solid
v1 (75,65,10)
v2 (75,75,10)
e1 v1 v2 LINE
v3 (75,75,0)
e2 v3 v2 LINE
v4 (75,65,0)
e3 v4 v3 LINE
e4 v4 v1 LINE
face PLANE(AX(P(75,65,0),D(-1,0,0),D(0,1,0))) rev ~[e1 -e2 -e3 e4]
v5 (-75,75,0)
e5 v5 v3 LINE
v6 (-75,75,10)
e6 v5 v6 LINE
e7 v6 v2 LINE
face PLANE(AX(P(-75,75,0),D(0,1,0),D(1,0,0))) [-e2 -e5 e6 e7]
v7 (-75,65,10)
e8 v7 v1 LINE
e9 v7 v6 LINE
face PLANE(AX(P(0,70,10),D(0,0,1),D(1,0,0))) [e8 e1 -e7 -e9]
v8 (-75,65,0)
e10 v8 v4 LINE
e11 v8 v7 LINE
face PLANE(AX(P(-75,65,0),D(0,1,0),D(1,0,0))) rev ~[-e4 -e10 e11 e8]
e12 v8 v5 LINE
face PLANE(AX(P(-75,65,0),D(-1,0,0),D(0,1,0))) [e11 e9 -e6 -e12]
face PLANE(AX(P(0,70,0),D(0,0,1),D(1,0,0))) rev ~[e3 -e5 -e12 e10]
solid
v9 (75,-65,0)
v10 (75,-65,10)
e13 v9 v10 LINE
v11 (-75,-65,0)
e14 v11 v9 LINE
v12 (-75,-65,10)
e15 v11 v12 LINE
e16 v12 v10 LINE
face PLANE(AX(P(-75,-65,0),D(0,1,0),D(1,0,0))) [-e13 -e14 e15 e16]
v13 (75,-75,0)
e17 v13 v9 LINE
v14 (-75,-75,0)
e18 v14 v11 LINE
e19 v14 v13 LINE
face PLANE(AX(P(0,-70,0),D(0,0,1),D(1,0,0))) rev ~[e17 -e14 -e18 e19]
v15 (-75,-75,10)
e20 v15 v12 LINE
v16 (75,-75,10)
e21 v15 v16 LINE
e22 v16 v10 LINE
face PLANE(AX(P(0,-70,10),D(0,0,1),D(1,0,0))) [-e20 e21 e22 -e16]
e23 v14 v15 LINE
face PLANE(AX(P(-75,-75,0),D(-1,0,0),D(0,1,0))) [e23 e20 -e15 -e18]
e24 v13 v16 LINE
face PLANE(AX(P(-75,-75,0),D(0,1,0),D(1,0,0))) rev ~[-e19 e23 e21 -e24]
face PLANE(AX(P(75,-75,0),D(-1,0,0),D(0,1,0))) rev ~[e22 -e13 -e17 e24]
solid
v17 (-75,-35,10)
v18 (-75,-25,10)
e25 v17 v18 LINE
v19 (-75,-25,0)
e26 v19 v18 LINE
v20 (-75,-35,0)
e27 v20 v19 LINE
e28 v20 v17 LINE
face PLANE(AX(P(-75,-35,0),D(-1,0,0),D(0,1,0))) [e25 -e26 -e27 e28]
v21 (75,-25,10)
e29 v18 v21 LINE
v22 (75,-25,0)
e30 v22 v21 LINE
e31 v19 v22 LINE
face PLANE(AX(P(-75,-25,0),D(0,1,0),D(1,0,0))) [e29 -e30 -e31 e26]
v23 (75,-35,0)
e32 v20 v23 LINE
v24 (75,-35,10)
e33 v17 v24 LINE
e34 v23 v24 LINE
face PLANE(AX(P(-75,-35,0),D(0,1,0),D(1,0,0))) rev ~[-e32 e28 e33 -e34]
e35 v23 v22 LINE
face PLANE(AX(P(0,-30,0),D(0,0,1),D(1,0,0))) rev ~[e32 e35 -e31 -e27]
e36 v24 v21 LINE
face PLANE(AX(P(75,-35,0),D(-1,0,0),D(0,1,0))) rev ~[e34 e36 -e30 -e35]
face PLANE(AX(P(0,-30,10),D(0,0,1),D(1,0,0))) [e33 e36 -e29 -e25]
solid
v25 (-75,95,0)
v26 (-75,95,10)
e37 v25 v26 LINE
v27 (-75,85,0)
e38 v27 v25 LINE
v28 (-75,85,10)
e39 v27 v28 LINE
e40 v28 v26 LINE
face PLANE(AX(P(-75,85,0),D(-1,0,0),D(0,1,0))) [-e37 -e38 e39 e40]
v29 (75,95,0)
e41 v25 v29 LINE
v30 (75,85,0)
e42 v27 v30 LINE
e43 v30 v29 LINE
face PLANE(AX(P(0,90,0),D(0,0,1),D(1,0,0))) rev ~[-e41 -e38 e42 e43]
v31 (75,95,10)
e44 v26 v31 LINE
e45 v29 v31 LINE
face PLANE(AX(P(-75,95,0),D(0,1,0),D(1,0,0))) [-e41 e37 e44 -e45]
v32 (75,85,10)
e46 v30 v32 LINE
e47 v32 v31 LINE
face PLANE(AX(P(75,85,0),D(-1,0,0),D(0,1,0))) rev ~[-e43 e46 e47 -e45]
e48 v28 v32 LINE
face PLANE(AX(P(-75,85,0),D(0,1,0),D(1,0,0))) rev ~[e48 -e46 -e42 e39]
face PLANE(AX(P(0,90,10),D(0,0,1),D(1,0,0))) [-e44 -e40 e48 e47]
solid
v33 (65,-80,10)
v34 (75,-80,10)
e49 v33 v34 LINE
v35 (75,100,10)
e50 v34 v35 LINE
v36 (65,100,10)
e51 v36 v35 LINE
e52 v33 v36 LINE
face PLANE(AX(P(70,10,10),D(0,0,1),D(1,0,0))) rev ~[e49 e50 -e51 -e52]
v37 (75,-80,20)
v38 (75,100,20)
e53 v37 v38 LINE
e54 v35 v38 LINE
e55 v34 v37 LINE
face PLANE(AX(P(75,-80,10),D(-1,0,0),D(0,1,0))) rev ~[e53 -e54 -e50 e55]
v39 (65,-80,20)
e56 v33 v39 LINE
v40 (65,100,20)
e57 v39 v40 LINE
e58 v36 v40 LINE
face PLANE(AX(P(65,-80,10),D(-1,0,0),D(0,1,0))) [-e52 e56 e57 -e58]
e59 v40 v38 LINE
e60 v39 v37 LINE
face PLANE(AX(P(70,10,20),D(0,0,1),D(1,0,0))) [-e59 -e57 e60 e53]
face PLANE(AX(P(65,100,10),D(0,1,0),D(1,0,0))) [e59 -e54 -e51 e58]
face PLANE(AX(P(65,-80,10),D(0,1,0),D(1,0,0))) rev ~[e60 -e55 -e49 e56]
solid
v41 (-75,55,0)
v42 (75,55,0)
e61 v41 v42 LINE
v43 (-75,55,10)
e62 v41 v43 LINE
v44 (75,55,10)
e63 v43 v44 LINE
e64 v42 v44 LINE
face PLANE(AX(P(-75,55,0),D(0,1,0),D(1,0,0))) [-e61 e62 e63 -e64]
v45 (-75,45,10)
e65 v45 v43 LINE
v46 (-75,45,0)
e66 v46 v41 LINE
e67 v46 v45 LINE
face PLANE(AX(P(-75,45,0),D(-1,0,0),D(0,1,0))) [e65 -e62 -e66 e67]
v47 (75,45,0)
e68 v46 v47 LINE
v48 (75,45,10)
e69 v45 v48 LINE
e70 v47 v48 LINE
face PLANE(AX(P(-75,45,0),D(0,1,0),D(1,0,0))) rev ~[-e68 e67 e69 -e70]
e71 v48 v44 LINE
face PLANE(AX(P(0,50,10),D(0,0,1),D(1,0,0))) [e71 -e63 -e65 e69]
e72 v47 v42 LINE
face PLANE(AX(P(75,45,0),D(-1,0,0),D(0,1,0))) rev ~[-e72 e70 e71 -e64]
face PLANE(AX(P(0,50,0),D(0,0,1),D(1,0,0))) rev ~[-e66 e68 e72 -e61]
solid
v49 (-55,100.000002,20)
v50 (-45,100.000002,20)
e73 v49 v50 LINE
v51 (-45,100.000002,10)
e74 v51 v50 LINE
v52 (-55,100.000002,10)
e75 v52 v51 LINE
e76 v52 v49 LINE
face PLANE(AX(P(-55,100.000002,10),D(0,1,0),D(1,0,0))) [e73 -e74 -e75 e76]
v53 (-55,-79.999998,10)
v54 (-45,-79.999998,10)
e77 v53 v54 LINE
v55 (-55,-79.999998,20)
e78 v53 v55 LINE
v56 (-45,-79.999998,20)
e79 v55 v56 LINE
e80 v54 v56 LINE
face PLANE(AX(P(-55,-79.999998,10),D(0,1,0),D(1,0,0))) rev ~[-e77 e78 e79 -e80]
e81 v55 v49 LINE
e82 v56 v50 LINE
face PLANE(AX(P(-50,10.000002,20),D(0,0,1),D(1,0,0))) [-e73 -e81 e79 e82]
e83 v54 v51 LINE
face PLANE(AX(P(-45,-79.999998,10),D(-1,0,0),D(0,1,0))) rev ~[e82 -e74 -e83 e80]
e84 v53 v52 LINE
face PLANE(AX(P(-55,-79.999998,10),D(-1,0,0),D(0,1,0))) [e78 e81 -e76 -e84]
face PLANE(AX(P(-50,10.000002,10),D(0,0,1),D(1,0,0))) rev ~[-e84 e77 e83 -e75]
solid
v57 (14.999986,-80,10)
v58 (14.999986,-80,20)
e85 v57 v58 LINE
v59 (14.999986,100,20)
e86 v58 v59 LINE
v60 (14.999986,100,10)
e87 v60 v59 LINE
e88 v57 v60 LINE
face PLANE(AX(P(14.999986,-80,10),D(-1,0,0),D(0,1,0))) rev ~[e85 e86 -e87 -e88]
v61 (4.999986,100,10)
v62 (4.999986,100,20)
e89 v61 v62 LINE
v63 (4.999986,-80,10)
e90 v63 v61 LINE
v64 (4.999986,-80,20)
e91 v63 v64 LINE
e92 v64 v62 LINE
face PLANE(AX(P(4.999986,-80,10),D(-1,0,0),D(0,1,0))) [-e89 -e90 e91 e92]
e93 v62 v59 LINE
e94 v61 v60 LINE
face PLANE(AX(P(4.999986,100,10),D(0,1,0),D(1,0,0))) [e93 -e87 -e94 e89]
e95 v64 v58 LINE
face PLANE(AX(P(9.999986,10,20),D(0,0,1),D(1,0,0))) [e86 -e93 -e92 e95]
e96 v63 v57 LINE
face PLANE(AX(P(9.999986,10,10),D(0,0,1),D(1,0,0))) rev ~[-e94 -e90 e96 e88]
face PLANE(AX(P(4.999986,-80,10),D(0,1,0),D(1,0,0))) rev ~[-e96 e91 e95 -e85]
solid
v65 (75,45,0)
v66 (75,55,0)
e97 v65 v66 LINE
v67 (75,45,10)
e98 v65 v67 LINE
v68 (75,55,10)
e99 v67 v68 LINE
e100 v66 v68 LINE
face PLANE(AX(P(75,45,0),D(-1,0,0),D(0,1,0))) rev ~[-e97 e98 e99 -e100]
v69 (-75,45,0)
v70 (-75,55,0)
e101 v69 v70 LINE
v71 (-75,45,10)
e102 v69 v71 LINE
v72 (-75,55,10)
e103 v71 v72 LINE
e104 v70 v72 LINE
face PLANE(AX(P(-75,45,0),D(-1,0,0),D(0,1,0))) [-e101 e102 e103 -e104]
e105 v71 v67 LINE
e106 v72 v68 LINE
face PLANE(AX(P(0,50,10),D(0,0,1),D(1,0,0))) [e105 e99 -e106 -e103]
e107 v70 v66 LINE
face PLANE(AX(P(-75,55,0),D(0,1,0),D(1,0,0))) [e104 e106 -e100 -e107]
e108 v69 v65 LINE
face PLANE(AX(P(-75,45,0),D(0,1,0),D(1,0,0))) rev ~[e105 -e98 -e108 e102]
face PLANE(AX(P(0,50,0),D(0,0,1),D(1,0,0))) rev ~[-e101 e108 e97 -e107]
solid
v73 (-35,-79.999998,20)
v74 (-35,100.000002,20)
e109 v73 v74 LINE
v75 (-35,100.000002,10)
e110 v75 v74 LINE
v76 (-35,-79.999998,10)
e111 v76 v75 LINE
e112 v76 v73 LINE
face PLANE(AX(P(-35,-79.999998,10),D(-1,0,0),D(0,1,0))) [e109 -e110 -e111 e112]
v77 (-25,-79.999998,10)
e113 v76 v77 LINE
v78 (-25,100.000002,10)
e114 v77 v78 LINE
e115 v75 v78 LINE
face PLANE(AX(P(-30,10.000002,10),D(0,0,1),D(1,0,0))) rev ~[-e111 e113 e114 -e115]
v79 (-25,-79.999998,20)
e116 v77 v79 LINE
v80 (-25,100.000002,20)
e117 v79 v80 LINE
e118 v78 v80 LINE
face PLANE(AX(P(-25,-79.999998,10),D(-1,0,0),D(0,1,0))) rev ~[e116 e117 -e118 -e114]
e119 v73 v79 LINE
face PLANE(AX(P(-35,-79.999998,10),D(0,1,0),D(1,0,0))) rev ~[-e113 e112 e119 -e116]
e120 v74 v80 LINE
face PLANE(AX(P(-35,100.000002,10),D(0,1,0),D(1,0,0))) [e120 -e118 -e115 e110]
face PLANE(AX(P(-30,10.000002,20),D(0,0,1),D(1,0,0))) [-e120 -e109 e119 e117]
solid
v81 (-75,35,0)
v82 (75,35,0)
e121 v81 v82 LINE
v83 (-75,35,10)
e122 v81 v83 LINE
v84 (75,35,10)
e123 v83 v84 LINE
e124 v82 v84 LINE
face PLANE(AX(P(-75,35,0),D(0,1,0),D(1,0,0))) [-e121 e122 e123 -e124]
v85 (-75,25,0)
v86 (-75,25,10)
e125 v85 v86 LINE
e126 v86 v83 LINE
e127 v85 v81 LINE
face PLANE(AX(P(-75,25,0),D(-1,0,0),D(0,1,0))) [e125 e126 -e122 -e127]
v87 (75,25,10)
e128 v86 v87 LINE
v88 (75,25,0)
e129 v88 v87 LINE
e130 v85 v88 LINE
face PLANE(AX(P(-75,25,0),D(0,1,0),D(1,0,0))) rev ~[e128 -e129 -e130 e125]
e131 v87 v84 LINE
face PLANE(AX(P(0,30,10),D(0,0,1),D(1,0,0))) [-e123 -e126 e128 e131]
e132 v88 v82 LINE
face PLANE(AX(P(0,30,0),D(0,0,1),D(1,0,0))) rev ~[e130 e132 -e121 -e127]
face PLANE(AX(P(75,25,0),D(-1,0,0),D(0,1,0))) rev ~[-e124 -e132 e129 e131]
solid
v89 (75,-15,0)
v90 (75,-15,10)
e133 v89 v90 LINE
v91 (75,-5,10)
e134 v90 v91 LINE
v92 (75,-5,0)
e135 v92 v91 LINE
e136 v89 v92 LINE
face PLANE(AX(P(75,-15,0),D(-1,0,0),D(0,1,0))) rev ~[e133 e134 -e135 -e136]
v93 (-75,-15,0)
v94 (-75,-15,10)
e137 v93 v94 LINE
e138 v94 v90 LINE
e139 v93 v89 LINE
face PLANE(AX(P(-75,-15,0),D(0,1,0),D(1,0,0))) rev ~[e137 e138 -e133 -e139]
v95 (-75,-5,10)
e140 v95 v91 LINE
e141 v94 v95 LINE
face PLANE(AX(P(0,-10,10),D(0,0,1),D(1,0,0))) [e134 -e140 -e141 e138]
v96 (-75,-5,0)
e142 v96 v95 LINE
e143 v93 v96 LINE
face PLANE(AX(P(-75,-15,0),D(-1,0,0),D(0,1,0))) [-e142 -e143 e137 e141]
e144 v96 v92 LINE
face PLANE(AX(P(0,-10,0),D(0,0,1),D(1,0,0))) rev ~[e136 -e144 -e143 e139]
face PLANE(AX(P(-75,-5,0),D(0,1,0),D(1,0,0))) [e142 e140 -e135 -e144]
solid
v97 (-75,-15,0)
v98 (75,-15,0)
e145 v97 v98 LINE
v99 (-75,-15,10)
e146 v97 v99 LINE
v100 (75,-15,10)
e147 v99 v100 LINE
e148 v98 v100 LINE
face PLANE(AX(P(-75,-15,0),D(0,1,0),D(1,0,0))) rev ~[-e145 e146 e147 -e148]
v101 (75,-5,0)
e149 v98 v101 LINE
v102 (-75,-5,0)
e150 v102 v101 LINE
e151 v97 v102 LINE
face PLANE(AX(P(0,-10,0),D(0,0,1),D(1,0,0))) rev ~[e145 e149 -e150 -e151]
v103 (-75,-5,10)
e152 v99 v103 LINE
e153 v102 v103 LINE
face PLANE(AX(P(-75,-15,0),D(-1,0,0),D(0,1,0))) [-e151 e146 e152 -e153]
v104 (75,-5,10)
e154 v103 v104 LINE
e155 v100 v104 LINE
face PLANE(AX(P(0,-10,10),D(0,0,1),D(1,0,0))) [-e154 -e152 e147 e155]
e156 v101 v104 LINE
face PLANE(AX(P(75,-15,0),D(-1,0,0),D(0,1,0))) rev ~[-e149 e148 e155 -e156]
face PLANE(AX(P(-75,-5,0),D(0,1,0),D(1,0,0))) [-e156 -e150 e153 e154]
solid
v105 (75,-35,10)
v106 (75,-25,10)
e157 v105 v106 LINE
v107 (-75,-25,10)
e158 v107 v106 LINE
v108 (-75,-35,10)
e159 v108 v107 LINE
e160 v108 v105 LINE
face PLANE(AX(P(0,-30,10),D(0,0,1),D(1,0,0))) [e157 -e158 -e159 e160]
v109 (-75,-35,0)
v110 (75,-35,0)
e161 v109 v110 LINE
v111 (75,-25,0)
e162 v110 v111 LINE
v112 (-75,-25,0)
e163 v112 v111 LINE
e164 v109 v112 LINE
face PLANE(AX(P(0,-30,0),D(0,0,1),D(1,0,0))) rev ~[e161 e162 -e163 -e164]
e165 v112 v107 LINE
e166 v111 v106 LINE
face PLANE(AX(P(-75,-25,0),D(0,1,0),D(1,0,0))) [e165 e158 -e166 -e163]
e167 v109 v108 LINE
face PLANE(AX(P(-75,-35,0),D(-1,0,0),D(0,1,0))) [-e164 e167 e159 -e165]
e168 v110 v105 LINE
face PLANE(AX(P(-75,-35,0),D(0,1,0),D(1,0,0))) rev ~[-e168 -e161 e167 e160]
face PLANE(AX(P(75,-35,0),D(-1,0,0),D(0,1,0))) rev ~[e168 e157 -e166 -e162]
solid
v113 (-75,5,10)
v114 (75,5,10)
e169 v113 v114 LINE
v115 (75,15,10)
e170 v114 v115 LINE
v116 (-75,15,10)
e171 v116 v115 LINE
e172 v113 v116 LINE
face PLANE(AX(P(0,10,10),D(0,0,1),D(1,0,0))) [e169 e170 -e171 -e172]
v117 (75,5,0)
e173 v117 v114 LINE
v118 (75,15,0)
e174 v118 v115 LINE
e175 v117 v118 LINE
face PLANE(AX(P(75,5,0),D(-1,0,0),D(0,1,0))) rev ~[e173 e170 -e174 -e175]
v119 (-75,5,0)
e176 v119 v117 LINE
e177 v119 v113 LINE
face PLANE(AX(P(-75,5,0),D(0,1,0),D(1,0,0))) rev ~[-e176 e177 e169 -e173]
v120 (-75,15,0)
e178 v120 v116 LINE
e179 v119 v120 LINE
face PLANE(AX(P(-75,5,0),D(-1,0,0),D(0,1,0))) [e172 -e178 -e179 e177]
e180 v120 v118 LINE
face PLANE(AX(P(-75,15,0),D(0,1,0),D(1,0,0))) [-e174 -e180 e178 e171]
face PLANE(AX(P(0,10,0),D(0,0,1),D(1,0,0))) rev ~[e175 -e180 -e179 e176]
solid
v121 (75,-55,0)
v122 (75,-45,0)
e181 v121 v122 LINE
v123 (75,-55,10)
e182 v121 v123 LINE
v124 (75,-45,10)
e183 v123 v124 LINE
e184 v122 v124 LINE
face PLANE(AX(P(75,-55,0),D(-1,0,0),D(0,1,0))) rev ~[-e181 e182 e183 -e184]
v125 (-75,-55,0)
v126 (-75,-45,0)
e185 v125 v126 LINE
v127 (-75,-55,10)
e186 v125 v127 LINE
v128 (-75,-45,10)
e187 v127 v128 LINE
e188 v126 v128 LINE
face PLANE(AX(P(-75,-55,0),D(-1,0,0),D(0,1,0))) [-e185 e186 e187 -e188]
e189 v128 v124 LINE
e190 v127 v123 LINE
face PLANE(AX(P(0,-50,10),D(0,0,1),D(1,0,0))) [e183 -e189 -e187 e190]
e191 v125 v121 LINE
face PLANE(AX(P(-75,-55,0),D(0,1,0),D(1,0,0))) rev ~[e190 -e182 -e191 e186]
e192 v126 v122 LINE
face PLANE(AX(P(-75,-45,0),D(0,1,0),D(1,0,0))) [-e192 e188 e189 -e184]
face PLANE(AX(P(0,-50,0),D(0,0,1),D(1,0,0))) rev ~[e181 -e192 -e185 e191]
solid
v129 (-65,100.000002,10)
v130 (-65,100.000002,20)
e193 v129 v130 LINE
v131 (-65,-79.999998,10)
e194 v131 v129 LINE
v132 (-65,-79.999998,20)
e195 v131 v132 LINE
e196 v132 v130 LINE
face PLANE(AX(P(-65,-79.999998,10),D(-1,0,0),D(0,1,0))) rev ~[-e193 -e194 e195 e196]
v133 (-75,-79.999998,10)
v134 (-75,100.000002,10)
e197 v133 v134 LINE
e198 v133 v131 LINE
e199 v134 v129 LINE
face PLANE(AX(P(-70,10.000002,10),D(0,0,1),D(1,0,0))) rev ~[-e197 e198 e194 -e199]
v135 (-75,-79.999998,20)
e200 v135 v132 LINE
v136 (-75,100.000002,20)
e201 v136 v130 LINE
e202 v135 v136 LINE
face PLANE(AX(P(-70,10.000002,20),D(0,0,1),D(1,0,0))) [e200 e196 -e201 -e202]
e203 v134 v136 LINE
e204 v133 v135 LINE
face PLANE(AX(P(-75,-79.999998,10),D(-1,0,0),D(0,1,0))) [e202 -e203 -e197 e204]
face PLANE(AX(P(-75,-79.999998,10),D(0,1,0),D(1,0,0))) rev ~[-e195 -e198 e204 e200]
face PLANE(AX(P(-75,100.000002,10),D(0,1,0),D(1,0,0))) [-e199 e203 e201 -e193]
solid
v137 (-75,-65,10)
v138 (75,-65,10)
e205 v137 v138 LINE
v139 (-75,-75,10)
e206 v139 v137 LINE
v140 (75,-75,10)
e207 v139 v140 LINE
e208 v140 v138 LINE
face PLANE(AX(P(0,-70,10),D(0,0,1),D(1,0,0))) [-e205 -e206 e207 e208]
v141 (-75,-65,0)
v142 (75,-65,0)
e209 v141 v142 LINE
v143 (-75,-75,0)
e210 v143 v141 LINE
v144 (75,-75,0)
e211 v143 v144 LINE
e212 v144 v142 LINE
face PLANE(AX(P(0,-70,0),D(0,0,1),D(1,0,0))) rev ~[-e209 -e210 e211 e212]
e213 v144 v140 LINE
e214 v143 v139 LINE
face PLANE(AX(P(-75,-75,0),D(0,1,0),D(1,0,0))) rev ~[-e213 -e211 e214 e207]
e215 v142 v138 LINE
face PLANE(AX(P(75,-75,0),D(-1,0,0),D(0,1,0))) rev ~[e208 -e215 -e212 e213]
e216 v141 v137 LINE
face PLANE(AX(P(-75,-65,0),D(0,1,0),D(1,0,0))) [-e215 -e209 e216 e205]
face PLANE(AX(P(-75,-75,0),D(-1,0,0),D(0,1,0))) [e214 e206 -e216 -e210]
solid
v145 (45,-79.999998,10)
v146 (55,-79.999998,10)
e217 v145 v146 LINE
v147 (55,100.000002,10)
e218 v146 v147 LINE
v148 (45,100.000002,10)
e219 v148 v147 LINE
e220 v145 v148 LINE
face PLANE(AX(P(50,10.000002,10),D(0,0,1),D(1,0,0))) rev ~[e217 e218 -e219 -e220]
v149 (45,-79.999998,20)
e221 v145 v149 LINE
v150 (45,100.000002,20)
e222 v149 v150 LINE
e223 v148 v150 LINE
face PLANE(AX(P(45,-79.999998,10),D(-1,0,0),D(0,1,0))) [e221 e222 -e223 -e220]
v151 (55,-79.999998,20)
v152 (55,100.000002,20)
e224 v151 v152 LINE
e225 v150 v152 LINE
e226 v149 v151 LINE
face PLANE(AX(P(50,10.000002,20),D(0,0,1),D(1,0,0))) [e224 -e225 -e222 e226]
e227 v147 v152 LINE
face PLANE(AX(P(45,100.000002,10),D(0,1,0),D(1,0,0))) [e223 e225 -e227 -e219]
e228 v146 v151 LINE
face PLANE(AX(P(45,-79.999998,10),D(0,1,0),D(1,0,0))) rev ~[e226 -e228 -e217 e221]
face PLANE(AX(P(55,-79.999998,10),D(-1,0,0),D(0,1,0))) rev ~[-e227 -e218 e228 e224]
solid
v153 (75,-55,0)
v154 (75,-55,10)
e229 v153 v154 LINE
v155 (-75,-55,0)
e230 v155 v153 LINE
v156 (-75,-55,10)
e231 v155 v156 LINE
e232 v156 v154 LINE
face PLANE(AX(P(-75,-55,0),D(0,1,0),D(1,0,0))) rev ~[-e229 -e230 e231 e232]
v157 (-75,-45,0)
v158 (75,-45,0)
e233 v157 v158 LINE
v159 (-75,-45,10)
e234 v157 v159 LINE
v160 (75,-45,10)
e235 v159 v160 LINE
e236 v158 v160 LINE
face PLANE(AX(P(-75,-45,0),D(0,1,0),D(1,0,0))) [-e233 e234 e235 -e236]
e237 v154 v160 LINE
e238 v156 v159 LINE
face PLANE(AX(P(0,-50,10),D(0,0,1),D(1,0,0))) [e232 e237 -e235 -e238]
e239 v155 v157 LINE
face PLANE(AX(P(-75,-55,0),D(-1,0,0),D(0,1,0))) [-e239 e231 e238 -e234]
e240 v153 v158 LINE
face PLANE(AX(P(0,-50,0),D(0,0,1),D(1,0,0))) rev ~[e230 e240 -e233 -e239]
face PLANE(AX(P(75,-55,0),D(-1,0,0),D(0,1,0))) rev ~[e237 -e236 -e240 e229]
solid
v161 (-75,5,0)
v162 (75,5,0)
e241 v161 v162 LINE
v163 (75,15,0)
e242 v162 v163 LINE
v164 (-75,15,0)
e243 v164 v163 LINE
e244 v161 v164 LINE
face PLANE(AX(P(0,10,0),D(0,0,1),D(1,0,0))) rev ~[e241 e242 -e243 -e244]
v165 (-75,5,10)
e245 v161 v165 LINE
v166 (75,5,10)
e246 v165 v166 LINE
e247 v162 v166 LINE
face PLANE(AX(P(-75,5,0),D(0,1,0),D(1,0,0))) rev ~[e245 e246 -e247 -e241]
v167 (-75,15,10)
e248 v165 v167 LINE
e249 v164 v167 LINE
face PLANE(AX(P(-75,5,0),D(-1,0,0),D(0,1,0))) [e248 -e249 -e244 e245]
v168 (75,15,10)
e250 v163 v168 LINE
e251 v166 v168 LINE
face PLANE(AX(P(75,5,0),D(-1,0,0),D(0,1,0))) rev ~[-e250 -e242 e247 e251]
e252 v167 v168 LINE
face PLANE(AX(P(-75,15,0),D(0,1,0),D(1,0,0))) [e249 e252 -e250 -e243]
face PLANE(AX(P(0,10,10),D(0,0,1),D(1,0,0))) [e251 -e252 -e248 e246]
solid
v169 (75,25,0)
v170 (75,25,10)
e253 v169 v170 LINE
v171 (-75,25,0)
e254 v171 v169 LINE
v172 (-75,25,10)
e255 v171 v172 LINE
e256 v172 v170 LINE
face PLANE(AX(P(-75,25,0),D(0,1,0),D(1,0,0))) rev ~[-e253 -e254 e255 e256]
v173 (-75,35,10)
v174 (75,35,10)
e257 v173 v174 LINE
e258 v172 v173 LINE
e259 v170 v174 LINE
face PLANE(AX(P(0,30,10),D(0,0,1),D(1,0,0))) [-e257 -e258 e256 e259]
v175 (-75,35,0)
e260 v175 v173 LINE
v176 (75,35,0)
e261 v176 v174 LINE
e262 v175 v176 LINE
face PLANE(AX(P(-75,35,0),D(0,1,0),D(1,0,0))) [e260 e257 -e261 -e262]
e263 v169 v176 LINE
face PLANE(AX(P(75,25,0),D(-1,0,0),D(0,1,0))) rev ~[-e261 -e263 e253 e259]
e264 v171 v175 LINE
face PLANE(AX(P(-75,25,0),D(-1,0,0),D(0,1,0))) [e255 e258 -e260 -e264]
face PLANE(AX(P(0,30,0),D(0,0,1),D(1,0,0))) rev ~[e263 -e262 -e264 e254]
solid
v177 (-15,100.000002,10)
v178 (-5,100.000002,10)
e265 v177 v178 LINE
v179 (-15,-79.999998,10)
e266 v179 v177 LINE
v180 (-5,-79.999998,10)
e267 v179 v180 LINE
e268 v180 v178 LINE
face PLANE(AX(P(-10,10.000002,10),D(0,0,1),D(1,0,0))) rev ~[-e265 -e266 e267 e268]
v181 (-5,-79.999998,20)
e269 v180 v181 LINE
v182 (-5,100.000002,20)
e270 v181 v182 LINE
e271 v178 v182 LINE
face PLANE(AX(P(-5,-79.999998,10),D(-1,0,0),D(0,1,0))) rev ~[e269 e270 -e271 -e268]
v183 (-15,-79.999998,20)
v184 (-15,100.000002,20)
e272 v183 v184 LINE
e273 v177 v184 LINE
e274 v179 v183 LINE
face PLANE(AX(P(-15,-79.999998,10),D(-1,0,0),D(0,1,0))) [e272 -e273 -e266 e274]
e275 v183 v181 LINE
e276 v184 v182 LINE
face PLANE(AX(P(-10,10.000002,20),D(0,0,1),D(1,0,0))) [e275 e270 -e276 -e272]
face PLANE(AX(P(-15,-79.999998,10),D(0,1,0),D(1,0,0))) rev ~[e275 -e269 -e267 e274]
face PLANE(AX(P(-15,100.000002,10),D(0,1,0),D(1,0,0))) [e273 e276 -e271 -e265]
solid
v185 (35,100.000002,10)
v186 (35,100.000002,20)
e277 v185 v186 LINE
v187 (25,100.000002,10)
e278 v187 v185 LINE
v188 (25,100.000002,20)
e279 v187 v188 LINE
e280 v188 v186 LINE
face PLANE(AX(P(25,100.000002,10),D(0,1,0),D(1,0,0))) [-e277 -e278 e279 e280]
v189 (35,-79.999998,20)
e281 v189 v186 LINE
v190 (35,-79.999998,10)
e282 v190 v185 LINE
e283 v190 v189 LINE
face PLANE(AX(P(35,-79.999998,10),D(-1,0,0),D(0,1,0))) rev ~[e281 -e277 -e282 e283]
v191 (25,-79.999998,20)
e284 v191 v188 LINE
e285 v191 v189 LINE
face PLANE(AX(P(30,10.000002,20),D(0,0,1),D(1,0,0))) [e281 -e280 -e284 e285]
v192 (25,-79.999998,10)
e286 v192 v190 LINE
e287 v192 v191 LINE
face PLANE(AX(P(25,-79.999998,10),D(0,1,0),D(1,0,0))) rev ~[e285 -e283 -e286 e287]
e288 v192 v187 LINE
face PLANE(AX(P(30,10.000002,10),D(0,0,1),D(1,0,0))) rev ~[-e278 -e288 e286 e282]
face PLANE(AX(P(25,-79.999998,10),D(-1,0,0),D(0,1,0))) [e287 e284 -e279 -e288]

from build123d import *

# Parameters (mm, degrees)
F0_W     = 150
F0_H     = 10
F1_DEPTH = 10
F2_DEPTH = 10
F3_W     = 10
F3_H     = 180
F4_DEPTH = 10


# Not quite as in the source:
# - a feature names something its author has since deleted; it is built from what else it names


with BuildPart() as f1:
    # F0 (on Top) → F1 (new body)
    with BuildSketch(Plane.XY):
        with Locations((0, 50)):
            Rectangle(F0_W, F0_H)
    extrude(amount=F1_DEPTH)


with BuildPart() as f1b:
    # F0 (on Top) → F1, piece 2 (new body)
    with BuildSketch(Plane.XY):
        with Locations((0, 30)):
            Rectangle(F0_W, F0_H)
    extrude(amount=F1_DEPTH)


with BuildPart() as f1c:
    # F0 (on Top) → F1, piece 3 (new body)
    with BuildSketch(Plane.XY):
        with Locations((0, 10)):
            Rectangle(F0_W, F0_H)
    extrude(amount=F1_DEPTH)


with BuildPart() as f1d:
    # F0 (on Top) → F1, piece 4 (new body)
    with BuildSketch(Plane.XY):
        with Locations((0, -10)):
            Rectangle(F0_W, F0_H)
    extrude(amount=F1_DEPTH)


with BuildPart() as f1e:
    # F0 (on Top) → F1, piece 5 (new body)
    with BuildSketch(Plane.XY):
        with Locations((0, -30)):
            Rectangle(F0_W, F0_H)
    extrude(amount=F1_DEPTH)


with BuildPart() as f1f:
    # F0 (on Top) → F1, piece 6 (new body)
    with BuildSketch(Plane.XY):
        with Locations((0, -50)):
            Rectangle(F0_W, F0_H)
    extrude(amount=F1_DEPTH)


with BuildPart() as f1g:
    # F0 (on Top) → F1, piece 7 (new body)
    with BuildSketch(Plane.XY):
        with Locations((0, -70)):
            Rectangle(F0_W, F0_H)
    extrude(amount=F1_DEPTH)


with BuildPart() as f2:
    # F0 (on Top) → F2 (new body)
    with BuildSketch(Plane.XY):
        with Locations((0, 90)):
            Rectangle(F0_W, F0_H)
    extrude(amount=F2_DEPTH)


with BuildPart() as f2b:
    # F0 (on Top) → F2, piece 2 (new body)
    with BuildSketch(Plane.XY):
        with Locations((0, 70)):
            Rectangle(F0_W, F0_H)
    extrude(amount=F2_DEPTH)


with BuildPart() as f2c:
    # F0 (on Top) → F2, piece 3 (new body)
    with BuildSketch(Plane.XY):
        with Locations((0, 50)):
            Rectangle(F0_W, F0_H)
    extrude(amount=F2_DEPTH)


with BuildPart() as f2d:
    # F0 (on Top) → F2, piece 4 (new body)
    with BuildSketch(Plane.XY):
        with Locations((0, 30)):
            Rectangle(F0_W, F0_H)
    extrude(amount=F2_DEPTH)


with BuildPart() as f2e:
    # F0 (on Top) → F2, piece 5 (new body)
    with BuildSketch(Plane.XY):
        with Locations((0, 10)):
            Rectangle(F0_W, F0_H)
    extrude(amount=F2_DEPTH)


with BuildPart() as f2f:
    # F0 (on Top) → F2, piece 6 (new body)
    with BuildSketch(Plane.XY):
        with Locations((0, -10)):
            Rectangle(F0_W, F0_H)
    extrude(amount=F2_DEPTH)


with BuildPart() as f2g:
    # F0 (on Top) → F2, piece 7 (new body)
    with BuildSketch(Plane.XY):
        with Locations((0, -30)):
            Rectangle(F0_W, F0_H)
    extrude(amount=F2_DEPTH)


with BuildPart() as f2h:
    # F0 (on Top) → F2, piece 8 (new body)
    with BuildSketch(Plane.XY):
        with Locations((0, -50)):
            Rectangle(F0_W, F0_H)
    extrude(amount=F2_DEPTH)


with BuildPart() as f2i:
    # F0 (on Top) → F2, piece 9 (new body)
    with BuildSketch(Plane.XY):
        with Locations((0, -70)):
            Rectangle(F0_W, F0_H)
    extrude(amount=F2_DEPTH)


with BuildPart() as f4:
    # F3 (on face) → F4 (new body)
    with BuildSketch(Plane.XY.offset(10)):
        with Locations((70, 10)):
            Rectangle(F3_W, F3_H)
    extrude(amount=F4_DEPTH)


with BuildPart() as f4b:
    # F3 (on face) → F4, piece 2 (new body)
    with BuildSketch(Plane.XY.offset(10)):
        with Locations((50, 10.0000017881)):
            Rectangle(F3_W, F3_H)
    extrude(amount=F4_DEPTH)


with BuildPart() as f4c:
    # F3 (on face) → F4, piece 3 (new body)
    with BuildSketch(Plane.XY.offset(10)):
        with Locations((30, 10.0000017881)):
            Rectangle(F3_W, F3_H)
    extrude(amount=F4_DEPTH)


with BuildPart() as f4d:
    # F3 (on face) → F4, piece 4 (new body)
    with BuildSketch(Plane.XY.offset(10)):
        with Locations((9.9999859929, 10.000000298)):
            Rectangle(F3_W, F3_H)
    extrude(amount=F4_DEPTH)


with BuildPart() as f4e:
    # F3 (on face) → F4, piece 5 (new body)
    with BuildSketch(Plane.XY.offset(10)):
        with Locations((-10, 10.0000017881)):
            Rectangle(F3_W, F3_H)
    extrude(amount=F4_DEPTH)


with BuildPart() as f4f:
    # F3 (on face) → F4, piece 6 (new body)
    with BuildSketch(Plane.XY.offset(10)):
        with Locations((-30, 10.0000017881)):
            Rectangle(F3_W, F3_H)
    extrude(amount=F4_DEPTH)


with BuildPart() as f4g:
    # F3 (on face) → F4, piece 7 (new body)
    with BuildSketch(Plane.XY.offset(10)):
        with Locations((-50, 10.0000017881)):
            Rectangle(F3_W, F3_H)
    extrude(amount=F4_DEPTH)


with BuildPart() as f4h:
    # F3 (on face) → F4, piece 8 (new body)
    with BuildSketch(Plane.XY.offset(10)):
        with Locations((-70, 10.0000017881)):
            Rectangle(F3_W, F3_H)
    extrude(amount=F4_DEPTH)


solid = Compound([f1.part, f1b.part, f1c.part, f1d.part, f1e.part, f1f.part, f1g.part, f2.part, f2b.part, f2c.part, f2d.part, f2e.part, f2f.part, f2g.part, f2h.part, f2i.part, f4.part, f4b.part, f4c.part, f4d.part, f4e.part, f4f.part, f4g.part, f4h.part])
